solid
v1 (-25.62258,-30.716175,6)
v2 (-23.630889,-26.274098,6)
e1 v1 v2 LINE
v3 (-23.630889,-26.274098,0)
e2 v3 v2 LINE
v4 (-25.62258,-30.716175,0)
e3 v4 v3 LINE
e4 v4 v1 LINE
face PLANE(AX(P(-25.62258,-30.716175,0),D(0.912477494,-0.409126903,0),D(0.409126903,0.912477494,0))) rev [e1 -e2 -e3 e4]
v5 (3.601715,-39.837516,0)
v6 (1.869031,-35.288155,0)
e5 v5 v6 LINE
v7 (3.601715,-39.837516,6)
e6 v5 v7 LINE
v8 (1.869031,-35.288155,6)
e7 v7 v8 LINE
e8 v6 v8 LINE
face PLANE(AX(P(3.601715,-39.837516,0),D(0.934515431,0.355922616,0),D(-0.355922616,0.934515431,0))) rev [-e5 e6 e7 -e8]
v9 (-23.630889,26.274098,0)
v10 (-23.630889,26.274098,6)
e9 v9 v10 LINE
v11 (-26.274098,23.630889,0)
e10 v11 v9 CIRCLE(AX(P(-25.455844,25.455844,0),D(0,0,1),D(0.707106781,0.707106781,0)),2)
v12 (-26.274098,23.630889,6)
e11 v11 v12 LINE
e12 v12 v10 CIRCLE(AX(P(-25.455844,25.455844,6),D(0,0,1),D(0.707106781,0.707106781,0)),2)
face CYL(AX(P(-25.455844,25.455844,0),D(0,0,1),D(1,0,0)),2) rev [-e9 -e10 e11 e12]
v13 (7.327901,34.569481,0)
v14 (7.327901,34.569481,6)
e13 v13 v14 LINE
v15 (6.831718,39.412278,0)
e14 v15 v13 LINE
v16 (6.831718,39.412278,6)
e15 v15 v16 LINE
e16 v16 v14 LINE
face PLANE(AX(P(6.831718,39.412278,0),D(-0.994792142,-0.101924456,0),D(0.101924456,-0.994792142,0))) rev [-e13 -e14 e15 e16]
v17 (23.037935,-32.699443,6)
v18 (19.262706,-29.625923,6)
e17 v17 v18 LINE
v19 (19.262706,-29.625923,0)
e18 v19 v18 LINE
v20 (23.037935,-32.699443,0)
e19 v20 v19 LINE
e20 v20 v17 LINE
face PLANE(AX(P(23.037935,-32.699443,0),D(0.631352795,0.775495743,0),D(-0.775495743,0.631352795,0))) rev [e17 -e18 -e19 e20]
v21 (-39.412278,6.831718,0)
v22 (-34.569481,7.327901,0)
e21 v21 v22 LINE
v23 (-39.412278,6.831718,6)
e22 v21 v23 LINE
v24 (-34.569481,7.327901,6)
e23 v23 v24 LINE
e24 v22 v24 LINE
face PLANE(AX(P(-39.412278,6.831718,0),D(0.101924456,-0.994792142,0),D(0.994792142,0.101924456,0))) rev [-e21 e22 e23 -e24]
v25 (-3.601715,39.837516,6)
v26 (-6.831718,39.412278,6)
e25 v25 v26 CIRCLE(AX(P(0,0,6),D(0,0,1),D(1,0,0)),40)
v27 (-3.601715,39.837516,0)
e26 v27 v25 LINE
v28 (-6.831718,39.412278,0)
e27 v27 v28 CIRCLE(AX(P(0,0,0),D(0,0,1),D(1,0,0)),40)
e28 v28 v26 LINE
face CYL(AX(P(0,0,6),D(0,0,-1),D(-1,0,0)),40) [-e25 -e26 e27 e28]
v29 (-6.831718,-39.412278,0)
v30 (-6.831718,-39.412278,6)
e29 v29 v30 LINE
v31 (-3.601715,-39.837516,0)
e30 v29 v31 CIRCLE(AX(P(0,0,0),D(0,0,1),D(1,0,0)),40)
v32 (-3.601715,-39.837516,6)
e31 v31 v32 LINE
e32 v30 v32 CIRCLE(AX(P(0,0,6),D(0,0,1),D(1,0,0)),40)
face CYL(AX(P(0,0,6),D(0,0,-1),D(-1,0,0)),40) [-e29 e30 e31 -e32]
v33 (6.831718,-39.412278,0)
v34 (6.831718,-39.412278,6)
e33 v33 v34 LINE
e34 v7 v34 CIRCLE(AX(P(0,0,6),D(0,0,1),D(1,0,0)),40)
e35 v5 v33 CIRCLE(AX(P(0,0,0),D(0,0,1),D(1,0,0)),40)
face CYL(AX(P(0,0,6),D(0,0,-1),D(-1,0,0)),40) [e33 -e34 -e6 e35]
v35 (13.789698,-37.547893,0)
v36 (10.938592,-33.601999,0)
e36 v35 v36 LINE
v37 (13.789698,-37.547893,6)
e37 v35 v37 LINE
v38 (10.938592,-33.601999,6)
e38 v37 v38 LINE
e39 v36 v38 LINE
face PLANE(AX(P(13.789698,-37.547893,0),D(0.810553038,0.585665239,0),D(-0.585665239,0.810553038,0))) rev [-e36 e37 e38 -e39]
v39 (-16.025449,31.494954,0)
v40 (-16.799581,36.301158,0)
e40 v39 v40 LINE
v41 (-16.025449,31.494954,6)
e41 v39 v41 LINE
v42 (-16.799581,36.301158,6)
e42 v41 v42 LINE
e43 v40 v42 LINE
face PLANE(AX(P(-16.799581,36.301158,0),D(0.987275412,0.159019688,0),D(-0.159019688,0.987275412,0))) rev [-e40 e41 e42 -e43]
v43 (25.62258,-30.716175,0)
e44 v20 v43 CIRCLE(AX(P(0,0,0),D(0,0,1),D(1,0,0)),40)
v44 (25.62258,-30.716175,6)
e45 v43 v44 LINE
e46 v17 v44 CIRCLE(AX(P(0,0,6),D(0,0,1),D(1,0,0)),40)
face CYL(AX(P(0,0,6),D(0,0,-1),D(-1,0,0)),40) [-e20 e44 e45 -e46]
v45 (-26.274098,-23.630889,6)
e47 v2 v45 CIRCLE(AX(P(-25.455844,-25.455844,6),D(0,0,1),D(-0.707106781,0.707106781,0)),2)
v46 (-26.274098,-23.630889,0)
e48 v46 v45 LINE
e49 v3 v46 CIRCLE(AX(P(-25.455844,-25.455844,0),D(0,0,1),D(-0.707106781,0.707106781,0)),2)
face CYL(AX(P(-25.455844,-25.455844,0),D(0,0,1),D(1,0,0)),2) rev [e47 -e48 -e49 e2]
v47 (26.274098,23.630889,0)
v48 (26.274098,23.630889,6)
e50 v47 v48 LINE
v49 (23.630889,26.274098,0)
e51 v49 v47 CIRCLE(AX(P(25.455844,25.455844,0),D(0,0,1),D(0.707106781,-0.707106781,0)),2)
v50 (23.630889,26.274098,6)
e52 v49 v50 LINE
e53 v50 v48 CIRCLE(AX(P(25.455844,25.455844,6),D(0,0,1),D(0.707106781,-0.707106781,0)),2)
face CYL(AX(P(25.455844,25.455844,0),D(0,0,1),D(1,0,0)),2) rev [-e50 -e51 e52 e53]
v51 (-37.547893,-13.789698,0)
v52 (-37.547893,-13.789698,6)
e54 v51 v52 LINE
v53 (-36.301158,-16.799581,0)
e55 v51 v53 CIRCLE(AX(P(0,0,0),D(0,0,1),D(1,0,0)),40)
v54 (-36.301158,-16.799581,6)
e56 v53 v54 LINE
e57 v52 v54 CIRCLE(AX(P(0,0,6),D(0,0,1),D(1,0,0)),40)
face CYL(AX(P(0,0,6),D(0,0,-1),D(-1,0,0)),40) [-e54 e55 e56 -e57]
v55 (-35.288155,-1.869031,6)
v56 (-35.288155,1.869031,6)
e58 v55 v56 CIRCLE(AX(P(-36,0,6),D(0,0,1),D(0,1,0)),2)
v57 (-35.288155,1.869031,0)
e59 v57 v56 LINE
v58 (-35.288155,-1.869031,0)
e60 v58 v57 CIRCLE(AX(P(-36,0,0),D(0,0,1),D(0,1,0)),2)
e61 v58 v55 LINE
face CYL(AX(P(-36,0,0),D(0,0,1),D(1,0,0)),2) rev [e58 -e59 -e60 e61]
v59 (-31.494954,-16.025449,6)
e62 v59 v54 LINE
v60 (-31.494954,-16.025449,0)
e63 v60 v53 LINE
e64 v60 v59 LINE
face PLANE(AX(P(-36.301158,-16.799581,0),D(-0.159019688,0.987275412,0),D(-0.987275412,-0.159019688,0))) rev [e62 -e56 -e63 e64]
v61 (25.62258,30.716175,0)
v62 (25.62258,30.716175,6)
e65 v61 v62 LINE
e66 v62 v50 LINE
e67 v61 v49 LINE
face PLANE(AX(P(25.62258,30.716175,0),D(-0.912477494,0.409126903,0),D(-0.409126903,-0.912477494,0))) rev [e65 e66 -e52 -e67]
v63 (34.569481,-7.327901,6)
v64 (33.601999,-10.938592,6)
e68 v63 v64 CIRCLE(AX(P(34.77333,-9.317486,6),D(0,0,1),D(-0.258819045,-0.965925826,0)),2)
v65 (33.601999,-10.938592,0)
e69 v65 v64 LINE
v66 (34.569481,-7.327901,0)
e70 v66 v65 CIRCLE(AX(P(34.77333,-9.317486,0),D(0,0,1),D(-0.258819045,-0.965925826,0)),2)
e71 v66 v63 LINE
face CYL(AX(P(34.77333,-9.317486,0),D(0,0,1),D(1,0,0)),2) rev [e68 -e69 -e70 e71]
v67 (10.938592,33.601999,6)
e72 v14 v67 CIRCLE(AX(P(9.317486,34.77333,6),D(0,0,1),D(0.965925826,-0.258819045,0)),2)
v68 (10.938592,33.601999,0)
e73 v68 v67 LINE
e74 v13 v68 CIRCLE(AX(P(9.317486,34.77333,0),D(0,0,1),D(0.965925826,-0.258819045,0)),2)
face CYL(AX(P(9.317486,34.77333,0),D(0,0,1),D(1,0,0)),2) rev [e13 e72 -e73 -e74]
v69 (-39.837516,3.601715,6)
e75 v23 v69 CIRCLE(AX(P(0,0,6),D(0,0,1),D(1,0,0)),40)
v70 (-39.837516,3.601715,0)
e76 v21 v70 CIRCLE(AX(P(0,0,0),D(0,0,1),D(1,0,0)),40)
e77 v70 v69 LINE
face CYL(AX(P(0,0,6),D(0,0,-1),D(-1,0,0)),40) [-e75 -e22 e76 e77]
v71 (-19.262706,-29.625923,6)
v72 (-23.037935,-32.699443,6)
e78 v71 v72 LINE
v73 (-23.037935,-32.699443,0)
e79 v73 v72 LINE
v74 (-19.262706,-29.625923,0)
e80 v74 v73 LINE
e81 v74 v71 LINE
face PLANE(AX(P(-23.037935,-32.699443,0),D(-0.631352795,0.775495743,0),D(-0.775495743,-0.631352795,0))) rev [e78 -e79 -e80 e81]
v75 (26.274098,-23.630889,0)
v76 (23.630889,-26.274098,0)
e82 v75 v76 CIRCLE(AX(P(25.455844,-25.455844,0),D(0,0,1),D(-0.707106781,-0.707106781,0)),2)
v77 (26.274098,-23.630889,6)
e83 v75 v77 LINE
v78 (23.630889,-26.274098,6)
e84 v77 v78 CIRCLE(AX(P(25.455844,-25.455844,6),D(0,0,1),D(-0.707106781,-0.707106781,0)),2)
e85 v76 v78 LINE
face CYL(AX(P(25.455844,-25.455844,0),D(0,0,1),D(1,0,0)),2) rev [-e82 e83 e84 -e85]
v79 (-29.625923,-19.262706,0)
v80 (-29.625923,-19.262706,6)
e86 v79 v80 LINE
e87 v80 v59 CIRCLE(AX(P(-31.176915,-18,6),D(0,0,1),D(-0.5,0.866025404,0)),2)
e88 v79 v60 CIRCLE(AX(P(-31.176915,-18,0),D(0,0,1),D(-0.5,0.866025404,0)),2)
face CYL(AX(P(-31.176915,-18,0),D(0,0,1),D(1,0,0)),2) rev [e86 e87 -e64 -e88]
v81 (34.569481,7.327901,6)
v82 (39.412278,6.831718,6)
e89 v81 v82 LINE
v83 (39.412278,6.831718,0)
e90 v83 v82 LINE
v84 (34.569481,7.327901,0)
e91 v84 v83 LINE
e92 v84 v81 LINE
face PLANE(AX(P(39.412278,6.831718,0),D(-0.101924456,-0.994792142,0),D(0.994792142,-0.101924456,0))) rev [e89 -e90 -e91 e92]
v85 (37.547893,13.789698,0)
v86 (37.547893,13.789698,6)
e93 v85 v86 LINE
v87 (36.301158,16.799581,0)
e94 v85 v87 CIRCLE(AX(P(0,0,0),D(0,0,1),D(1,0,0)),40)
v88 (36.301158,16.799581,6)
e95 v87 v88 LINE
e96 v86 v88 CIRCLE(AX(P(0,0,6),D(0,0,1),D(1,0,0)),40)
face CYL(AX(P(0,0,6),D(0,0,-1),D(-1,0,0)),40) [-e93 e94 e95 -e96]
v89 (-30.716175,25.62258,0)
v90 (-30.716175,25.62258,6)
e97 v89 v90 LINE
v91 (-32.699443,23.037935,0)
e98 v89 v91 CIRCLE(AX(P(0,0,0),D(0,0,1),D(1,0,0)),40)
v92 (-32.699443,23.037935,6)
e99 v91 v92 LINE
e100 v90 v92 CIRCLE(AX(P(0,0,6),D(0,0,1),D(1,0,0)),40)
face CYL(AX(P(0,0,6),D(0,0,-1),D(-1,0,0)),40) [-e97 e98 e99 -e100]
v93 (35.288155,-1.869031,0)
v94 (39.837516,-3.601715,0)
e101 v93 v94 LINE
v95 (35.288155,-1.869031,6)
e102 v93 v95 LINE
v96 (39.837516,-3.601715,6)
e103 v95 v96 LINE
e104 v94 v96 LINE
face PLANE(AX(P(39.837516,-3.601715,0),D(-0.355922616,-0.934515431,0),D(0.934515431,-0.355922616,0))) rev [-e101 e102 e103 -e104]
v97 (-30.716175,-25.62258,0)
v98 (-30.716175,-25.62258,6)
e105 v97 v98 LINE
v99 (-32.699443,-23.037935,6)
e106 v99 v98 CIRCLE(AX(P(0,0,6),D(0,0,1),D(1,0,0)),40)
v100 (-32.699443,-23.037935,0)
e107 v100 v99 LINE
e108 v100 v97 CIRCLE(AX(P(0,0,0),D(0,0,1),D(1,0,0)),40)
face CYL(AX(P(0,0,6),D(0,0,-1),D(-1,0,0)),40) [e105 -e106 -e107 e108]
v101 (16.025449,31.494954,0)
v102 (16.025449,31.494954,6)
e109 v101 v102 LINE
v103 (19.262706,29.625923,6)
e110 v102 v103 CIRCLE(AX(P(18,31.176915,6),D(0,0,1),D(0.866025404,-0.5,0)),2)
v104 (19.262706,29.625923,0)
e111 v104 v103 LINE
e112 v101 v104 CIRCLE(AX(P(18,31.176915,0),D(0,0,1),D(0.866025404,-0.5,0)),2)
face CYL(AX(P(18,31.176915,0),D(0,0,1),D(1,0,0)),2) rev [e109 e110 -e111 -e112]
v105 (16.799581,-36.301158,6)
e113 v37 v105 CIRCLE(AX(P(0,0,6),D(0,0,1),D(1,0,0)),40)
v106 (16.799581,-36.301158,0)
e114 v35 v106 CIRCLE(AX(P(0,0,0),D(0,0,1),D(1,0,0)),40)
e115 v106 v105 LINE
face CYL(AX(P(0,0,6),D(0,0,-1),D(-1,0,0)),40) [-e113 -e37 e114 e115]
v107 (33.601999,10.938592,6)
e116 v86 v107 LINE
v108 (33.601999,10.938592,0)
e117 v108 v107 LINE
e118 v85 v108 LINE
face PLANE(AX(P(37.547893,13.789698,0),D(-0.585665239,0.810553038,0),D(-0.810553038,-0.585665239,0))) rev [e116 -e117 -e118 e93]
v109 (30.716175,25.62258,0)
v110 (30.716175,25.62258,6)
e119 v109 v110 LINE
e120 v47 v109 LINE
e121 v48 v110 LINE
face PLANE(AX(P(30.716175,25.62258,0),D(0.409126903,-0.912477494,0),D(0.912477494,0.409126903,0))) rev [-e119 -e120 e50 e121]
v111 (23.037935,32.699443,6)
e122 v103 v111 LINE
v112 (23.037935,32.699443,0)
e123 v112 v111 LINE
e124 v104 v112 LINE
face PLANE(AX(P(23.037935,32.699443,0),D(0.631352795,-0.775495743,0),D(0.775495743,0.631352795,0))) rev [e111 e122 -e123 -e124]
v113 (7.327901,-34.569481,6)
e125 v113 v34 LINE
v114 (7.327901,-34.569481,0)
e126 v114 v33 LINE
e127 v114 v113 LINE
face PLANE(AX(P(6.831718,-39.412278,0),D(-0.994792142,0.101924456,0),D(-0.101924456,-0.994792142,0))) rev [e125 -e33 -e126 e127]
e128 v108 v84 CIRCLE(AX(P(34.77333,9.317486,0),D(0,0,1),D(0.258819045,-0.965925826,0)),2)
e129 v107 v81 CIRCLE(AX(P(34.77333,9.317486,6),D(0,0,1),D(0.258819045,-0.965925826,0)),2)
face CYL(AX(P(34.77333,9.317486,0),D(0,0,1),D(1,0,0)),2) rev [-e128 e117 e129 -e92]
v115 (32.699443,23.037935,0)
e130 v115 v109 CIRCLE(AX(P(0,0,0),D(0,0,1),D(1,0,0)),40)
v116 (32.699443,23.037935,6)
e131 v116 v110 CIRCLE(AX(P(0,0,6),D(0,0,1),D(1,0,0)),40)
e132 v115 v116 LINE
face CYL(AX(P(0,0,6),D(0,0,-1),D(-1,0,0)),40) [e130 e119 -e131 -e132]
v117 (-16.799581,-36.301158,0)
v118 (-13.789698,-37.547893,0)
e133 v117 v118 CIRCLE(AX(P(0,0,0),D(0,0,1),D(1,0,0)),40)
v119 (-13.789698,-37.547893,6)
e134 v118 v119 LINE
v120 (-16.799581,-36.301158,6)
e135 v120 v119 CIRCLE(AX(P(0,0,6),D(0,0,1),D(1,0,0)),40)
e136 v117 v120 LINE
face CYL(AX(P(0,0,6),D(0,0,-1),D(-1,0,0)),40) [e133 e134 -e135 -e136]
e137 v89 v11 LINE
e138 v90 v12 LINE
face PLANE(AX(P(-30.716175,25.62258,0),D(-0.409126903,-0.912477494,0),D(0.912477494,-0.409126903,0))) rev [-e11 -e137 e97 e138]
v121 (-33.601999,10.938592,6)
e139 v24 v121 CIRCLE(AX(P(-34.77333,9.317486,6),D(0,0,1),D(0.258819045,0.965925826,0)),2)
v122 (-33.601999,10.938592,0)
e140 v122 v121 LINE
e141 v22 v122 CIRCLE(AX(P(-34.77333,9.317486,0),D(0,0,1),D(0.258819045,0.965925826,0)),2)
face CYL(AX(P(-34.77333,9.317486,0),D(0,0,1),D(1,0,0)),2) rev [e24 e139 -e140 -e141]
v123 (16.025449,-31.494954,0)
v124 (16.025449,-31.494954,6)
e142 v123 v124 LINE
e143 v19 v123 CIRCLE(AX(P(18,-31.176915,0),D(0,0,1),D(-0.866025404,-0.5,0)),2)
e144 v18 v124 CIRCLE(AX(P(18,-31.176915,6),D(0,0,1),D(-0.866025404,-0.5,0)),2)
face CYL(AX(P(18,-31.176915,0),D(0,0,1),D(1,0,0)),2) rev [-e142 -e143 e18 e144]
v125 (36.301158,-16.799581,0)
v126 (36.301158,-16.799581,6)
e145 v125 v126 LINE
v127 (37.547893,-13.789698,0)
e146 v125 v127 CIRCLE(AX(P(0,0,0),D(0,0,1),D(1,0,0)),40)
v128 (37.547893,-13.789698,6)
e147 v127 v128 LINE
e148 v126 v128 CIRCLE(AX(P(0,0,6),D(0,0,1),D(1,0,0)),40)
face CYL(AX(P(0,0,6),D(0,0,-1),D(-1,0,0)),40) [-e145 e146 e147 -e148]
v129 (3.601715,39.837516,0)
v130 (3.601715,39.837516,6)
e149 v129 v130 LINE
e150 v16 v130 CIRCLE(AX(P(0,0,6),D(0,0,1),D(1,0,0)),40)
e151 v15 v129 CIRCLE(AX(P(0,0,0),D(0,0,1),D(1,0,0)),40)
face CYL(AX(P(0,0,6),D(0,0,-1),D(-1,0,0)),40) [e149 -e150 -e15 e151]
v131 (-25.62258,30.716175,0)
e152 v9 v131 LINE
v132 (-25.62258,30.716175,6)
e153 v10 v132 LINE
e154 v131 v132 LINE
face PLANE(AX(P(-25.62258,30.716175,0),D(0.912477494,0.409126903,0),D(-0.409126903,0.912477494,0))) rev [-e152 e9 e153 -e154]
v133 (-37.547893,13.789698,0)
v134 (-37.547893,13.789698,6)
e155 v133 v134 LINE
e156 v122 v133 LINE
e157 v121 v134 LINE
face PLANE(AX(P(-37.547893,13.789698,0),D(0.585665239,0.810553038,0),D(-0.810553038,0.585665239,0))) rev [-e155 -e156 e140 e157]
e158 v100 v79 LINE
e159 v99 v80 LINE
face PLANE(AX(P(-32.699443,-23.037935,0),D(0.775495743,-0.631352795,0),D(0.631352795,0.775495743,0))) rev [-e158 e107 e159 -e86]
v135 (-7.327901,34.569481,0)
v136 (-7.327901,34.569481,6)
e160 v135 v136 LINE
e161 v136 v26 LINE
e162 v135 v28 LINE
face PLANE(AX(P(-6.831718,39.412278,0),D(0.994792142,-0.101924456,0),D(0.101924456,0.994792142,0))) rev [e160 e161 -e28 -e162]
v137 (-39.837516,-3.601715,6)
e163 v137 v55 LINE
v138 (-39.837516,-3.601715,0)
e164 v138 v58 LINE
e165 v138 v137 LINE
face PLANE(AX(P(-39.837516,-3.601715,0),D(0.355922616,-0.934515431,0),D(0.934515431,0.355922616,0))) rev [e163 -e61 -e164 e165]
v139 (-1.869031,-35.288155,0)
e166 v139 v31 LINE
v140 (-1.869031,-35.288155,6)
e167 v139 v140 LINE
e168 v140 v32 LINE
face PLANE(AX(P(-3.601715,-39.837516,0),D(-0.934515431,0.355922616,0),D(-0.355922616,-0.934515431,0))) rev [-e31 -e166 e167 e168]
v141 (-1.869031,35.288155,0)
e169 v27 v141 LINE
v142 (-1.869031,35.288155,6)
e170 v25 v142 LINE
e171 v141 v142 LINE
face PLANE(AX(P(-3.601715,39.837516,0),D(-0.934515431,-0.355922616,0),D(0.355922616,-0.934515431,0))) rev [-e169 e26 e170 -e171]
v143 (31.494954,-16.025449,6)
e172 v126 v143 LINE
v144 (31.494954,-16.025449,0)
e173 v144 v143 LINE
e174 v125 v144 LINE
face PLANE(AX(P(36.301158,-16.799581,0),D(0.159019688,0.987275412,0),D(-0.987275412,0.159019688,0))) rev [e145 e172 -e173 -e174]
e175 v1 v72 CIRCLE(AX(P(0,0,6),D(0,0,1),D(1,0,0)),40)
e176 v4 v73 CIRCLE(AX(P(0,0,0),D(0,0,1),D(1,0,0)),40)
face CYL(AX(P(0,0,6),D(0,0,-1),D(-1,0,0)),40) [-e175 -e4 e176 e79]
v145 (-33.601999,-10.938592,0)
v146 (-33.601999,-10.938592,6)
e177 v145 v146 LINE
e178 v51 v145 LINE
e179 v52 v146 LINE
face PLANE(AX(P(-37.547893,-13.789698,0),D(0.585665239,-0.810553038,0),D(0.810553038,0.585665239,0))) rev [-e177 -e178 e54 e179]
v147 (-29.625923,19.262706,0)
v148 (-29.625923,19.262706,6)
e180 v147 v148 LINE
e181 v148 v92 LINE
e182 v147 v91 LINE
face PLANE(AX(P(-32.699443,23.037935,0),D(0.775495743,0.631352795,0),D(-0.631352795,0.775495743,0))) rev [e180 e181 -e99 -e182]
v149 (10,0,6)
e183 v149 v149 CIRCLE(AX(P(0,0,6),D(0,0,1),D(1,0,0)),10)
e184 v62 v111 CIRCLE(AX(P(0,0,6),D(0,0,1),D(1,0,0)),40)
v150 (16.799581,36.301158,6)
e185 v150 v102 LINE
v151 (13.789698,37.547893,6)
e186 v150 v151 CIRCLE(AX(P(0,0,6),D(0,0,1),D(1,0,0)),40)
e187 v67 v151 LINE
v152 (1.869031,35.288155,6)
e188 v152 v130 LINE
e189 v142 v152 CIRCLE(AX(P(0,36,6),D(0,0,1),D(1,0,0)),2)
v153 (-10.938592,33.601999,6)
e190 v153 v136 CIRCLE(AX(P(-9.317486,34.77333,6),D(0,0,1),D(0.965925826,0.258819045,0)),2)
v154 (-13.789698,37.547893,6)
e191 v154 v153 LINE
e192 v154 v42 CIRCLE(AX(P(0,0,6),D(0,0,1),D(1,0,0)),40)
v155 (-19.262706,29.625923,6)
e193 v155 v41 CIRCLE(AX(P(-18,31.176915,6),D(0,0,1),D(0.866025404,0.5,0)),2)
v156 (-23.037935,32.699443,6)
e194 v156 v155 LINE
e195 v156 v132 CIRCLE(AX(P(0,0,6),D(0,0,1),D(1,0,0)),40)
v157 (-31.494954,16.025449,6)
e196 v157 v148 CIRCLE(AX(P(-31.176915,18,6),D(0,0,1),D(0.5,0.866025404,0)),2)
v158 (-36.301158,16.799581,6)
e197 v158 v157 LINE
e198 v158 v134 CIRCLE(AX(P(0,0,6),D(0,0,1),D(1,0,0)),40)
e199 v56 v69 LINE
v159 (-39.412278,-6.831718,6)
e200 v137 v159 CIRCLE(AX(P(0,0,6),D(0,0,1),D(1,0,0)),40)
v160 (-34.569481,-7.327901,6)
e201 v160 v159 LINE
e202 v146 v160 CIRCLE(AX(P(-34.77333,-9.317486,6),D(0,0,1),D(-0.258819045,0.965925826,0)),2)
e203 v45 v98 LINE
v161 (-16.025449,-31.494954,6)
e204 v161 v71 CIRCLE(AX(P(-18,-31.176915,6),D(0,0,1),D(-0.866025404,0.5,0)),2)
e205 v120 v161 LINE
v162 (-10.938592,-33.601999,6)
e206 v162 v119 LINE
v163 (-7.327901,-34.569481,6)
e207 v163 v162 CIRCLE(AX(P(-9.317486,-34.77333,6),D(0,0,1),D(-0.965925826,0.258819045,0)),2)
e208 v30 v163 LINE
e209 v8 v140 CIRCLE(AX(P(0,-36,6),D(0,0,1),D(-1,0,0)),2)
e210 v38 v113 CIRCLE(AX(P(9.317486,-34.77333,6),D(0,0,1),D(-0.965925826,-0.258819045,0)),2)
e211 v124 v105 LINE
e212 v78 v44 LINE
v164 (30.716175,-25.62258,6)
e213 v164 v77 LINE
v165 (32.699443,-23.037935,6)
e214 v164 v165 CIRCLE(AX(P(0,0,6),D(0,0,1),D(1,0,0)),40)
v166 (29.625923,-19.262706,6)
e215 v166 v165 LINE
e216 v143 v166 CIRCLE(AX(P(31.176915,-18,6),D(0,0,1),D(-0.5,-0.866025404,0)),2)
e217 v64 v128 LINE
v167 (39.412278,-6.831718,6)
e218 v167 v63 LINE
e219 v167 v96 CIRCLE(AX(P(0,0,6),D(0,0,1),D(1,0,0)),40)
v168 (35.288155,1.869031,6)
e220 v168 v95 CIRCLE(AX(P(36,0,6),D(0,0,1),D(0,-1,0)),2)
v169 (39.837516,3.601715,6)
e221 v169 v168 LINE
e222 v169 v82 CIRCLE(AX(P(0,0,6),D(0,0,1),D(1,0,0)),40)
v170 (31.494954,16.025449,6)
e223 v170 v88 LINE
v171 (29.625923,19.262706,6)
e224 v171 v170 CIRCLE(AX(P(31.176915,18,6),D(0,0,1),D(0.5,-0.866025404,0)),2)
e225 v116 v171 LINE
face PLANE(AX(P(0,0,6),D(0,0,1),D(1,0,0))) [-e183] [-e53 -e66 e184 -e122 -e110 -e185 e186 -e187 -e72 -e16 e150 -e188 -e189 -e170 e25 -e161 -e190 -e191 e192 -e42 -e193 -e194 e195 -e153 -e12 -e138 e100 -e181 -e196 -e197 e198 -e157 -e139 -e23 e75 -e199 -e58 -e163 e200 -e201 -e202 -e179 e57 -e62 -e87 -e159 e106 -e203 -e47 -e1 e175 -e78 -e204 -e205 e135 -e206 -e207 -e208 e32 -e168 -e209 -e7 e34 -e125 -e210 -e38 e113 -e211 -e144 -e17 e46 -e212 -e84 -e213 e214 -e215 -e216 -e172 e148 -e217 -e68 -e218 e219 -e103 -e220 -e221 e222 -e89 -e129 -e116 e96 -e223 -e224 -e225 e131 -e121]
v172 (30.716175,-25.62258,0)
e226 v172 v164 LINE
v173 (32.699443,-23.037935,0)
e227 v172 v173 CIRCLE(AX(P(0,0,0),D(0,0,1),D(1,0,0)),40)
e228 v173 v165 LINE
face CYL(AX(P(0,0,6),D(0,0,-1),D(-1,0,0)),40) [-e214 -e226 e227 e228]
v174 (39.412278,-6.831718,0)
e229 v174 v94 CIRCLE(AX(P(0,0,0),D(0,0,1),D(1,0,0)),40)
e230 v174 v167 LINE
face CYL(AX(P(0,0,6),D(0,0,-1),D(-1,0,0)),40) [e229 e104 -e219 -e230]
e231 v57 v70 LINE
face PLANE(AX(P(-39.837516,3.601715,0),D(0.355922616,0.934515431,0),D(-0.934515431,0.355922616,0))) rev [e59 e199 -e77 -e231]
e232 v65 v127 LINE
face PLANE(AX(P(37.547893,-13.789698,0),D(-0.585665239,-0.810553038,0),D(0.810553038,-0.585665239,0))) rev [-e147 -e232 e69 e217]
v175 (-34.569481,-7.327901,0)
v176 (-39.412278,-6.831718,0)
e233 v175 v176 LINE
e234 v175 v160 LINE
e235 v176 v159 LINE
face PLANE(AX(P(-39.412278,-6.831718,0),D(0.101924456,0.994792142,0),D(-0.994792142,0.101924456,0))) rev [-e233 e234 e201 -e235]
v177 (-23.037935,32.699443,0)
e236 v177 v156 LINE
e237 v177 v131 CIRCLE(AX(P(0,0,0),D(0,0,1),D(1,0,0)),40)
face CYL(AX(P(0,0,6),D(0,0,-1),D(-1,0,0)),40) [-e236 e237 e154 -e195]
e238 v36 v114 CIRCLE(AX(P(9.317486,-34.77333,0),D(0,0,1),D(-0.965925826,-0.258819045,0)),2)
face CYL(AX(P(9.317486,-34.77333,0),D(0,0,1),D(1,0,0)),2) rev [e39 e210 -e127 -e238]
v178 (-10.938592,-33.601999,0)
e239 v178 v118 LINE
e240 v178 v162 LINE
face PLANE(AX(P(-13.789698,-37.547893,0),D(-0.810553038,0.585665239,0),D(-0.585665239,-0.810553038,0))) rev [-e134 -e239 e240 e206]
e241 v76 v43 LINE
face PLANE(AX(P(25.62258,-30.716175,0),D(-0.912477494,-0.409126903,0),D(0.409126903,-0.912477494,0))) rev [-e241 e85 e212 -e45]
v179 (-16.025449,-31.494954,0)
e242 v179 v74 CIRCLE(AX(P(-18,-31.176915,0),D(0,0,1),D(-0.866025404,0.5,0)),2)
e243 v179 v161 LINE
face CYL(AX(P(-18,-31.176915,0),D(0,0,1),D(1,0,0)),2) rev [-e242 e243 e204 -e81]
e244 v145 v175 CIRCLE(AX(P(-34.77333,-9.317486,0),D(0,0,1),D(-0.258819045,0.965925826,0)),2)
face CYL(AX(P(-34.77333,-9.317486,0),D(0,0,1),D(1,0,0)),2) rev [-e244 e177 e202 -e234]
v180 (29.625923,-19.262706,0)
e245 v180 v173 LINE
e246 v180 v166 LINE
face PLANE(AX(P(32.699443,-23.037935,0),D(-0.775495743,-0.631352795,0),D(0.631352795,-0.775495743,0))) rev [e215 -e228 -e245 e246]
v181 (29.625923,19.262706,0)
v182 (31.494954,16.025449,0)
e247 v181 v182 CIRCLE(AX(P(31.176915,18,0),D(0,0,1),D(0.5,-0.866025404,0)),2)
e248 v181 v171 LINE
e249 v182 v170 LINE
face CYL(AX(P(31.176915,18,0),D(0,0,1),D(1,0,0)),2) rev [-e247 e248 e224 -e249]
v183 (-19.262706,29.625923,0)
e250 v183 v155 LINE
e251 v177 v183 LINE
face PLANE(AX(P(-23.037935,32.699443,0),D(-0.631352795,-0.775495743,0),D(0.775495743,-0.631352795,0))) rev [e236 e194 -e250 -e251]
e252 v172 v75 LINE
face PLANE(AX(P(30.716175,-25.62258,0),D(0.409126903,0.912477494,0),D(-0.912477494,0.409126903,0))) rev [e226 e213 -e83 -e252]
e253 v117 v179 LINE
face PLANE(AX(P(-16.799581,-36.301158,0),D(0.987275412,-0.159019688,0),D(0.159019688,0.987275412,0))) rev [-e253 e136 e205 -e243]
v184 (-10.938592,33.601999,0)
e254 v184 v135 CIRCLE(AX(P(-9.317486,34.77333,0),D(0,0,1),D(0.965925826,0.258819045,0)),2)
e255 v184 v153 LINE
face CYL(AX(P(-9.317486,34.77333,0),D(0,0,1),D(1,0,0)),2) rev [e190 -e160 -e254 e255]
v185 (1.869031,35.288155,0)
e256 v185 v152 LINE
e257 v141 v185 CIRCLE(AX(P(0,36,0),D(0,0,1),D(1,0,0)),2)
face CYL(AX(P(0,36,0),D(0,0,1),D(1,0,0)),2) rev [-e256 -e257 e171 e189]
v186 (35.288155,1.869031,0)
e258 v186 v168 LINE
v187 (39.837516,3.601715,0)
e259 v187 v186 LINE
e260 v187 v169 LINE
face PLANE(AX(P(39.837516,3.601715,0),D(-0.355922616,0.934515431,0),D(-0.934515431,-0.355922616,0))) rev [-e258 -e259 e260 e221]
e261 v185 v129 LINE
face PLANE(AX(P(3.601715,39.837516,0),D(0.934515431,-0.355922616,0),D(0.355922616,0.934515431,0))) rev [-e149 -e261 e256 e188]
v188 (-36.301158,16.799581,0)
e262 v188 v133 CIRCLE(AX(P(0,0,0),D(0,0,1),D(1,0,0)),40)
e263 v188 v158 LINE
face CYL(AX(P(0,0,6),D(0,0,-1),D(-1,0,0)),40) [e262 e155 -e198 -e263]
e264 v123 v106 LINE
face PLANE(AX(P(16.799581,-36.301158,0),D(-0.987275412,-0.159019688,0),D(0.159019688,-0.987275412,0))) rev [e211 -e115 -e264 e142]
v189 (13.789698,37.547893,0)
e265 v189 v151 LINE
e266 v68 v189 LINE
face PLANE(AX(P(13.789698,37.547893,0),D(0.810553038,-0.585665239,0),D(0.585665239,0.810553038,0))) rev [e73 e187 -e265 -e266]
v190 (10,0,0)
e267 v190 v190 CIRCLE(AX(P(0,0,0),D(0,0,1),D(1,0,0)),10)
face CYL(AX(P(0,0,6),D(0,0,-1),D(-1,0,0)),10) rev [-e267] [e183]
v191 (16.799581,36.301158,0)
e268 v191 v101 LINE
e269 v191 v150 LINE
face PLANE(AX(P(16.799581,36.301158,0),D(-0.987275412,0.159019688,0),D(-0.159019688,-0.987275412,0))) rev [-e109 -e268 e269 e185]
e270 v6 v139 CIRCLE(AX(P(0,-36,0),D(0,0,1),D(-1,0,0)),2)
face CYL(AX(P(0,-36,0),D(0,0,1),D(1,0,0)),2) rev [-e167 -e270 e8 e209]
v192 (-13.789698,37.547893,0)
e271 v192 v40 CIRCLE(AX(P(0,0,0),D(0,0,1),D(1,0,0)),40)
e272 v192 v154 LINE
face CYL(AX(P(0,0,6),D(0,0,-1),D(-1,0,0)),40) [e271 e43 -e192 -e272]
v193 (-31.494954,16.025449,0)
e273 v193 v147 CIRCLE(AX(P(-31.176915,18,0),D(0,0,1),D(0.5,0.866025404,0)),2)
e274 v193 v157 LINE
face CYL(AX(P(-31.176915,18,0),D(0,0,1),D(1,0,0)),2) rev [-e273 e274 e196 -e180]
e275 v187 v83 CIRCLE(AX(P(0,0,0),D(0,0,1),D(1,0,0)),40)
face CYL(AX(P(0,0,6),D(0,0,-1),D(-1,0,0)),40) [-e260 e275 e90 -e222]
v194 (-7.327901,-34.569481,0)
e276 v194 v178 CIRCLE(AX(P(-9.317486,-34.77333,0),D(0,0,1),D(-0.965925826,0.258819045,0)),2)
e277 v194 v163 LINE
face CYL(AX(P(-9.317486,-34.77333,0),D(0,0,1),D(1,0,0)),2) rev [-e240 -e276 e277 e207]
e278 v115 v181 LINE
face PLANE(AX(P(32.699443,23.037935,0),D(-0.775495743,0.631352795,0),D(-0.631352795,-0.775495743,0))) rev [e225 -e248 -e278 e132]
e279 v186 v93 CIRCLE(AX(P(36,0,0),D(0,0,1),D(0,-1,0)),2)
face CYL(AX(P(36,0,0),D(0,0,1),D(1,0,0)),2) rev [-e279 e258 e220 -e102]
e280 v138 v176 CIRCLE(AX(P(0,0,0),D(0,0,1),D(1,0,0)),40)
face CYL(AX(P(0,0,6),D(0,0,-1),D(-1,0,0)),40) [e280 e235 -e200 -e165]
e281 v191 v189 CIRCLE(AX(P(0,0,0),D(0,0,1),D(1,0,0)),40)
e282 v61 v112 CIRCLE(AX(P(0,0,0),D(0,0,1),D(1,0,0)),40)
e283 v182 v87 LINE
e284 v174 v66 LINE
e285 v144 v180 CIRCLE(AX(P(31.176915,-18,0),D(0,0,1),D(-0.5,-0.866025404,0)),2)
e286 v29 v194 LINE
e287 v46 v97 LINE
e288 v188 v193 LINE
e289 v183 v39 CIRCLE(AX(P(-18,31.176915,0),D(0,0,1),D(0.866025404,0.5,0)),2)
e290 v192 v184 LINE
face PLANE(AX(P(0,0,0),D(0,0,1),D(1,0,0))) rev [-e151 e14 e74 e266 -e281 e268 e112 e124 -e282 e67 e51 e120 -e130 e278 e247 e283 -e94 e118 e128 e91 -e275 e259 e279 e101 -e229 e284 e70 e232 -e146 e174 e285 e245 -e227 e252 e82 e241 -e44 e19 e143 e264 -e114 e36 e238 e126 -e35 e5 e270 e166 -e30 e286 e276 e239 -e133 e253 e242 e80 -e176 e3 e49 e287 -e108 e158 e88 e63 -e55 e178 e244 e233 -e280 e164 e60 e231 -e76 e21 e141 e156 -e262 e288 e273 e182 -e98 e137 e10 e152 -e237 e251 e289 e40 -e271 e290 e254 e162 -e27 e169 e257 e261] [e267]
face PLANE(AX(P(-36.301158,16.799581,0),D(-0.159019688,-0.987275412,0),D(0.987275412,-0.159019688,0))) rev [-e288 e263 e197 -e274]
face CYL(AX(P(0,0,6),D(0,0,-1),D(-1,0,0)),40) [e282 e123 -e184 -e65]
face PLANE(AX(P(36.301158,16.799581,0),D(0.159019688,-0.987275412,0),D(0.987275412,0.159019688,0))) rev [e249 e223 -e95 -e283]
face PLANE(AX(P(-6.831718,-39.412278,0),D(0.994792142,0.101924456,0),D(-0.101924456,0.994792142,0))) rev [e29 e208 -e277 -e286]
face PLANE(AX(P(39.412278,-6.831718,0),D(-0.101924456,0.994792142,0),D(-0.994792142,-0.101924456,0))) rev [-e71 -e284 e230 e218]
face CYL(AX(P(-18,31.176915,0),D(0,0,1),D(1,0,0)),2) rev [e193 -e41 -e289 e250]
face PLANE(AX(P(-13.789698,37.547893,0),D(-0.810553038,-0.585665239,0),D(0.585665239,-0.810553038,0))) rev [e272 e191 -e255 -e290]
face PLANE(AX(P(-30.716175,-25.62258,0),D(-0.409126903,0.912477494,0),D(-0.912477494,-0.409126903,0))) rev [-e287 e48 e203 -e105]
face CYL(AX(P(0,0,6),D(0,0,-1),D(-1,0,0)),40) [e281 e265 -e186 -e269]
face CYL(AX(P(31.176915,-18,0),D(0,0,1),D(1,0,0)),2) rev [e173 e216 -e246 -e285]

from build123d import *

# Parameters (mm, degrees)
SKETCH1_R           = 40
SKETCH1_R_2         = 10
BOSS_EXTRUDE1_DEPTH = 6
CUT_EXTRUDE1_START  = -6
CUT_EXTRUDE1_DEPTH  = 6
CIRPATTERN1_DEPTH   = 6


# Read off the part's stored shape, not the designer's step: CirPattern1
with BuildPart() as part:
    # Sketch1 → Boss-Extrude1 (new body)
    with BuildSketch(Plane.XY):
        Circle(SKETCH1_R)
        Circle(SKETCH1_R_2, mode=Mode.SUBTRACT)
    extrude(amount=BOSS_EXTRUDE1_DEPTH)

    # Sketch2 → Cut-Extrude1 (cut)
    with BuildSketch(Plane.XY.offset(6).offset(CUT_EXTRUDE1_START)):
        with BuildLine():
            Line((-3.601715358, 39.837515566), (-1.869030862, 35.288154767))
            ThreePointArc((-1.869030862, 35.288154767), (0, 34), (1.869030862, 35.288154767))
            Line((1.869030862, 35.288154767), (3.601715358, 39.837515566))
            ThreePointArc((3.601715358, 39.837515566), (0, 40), (-3.601715358, 39.837515566))
        make_face()
    extrude(amount=CUT_EXTRUDE1_DEPTH, mode=Mode.SUBTRACT)

    # CirPattern1 outline → CirPattern1 (cut)
    with BuildSketch(Plane.XY):
        with BuildLine():
            Line((-13.789697621, 37.547892611), (-10.9385917, 33.601999269))
            ThreePointArc((-10.9385917, 33.601999269), (-8.799847533, 32.841478094), (-7.32790134, 34.569480835))
            Line((-7.32790134, 34.569480835), (-6.831717855, 39.41227767))
            ThreePointArc((-6.831717855, 39.41227767), (-10.352761804, 38.637033051), (-13.789697621, 37.547892611))
        make_face()
        with BuildLine():
            Line((10.9385917, 33.601999269), (13.789697621, 37.547892611))
            ThreePointArc((13.789697621, 37.547892611), (10.352761804, 38.637033051), (6.831717855, 39.41227767))
            Line((6.831717855, 39.41227767), (7.32790134, 34.569480835))
            ThreePointArc((7.32790134, 34.569480835), (8.799847533, 32.841478094), (10.9385917, 33.601999269))
        make_face()
        with BuildLine():
            Line((19.262705591, 29.62592305), (23.03793478, 32.699442825))
            ThreePointArc((23.03793478, 32.699442825), (20, 34.641016151), (16.799580786, 36.301158183))
            Line((16.799580786, 36.301158183), (16.025449176, 31.494953912))
            ThreePointArc((16.025449176, 31.494953912), (17, 29.444863729), (19.262705591, 29.62592305))
        make_face()
        with BuildLine():
            Line((26.274097929, 23.630889134), (30.716174756, 25.622580049))
            ThreePointArc((30.716174756, 25.622580049), (28.284271247, 28.284271247), (25.622580049, 30.716174756))
            Line((25.622580049, 30.716174756), (23.630889134, 26.274097929))
            ThreePointArc((23.630889134, 26.274097929), (24.04163056, 24.04163056), (26.274097929, 23.630889134))
        make_face()
        with BuildLine():
            Line((31.494953912, 16.025449176), (36.301158183, 16.799580786))
            ThreePointArc((36.301158183, 16.799580786), (34.641016151, 20), (32.699442825, 23.03793478))
            Line((32.699442825, 23.03793478), (29.62592305, 19.262705591))
            ThreePointArc((29.62592305, 19.262705591), (29.444863729, 17), (31.494953912, 16.025449176))
        make_face()
        with BuildLine():
            Line((34.569480835, 7.32790134), (39.41227767, 6.831717855))
            ThreePointArc((39.41227767, 6.831717855), (38.637033052, 10.352761804), (37.547892611, 13.789697621))
            Line((37.547892611, 13.789697621), (33.601999269, 10.9385917))
            ThreePointArc((33.601999269, 10.9385917), (32.841478094, 8.799847533), (34.569480835, 7.32790134))
        make_face()
        with BuildLine():
            Line((35.288154767, -1.869030862), (39.837515566, -3.601715358))
            ThreePointArc((39.837515566, -3.601715358), (40, 0), (39.837515566, 3.601715358))
            Line((39.837515566, 3.601715358), (35.288154767, 1.869030862))
            ThreePointArc((35.288154767, 1.869030862), (34, 0), (35.288154767, -1.869030862))
        make_face()
        with BuildLine():
            Line((33.601999269, -10.9385917), (37.547892611, -13.789697621))
            ThreePointArc((37.547892611, -13.789697621), (38.637033052, -10.352761804), (39.41227767, -6.831717855))
            Line((39.41227767, -6.831717855), (34.569480835, -7.32790134))
            ThreePointArc((34.569480835, -7.32790134), (32.841478094, -8.799847533), (33.601999269, -10.9385917))
        make_face()
        with BuildLine():
            Line((29.62592305, -19.262705591), (32.699442825, -23.03793478))
            ThreePointArc((32.699442825, -23.03793478), (34.641016151, -20), (36.301158183, -16.799580786))
            Line((36.301158183, -16.799580786), (31.494953912, -16.025449176))
            ThreePointArc((31.494953912, -16.025449176), (29.444863729, -17), (29.62592305, -19.262705591))
        make_face()
        with BuildLine():
            Line((23.630889134, -26.274097929), (25.622580049, -30.716174756))
            ThreePointArc((25.622580049, -30.716174756), (28.284271247, -28.284271247), (30.716174756, -25.622580049))
            Line((30.716174756, -25.622580049), (26.274097929, -23.630889134))
            ThreePointArc((26.274097929, -23.630889134), (24.04163056, -24.04163056), (23.630889134, -26.274097929))
        make_face()
        with BuildLine():
            Line((16.025449176, -31.494953912), (16.799580786, -36.301158183))
            ThreePointArc((16.799580786, -36.301158183), (20, -34.641016151), (23.03793478, -32.699442825))
            Line((23.03793478, -32.699442825), (19.262705591, -29.62592305))
            ThreePointArc((19.262705591, -29.62592305), (17, -29.444863729), (16.025449176, -31.494953912))
        make_face()
        with BuildLine():
            Line((7.32790134, -34.569480835), (6.831717855, -39.41227767))
            ThreePointArc((6.831717855, -39.41227767), (10.352761804, -38.637033052), (13.789697621, -37.547892611))
            Line((13.789697621, -37.547892611), (10.9385917, -33.601999269))
            ThreePointArc((10.9385917, -33.601999269), (8.799847533, -32.841478094), (7.32790134, -34.569480835))
        make_face()
        with BuildLine():
            Line((-1.869030862, -35.288154767), (-3.601715358, -39.837515566))
            ThreePointArc((-3.601715358, -39.837515566), (0, -40), (3.601715358, -39.837515566))
            Line((3.601715358, -39.837515566), (1.869030862, -35.288154767))
            ThreePointArc((1.869030862, -35.288154767), (0, -34), (-1.869030862, -35.288154767))
        make_face()
        with BuildLine():
            Line((-10.9385917, -33.601999269), (-13.789697621, -37.547892611))
            ThreePointArc((-13.789697621, -37.547892611), (-10.352761804, -38.637033052), (-6.831717855, -39.41227767))
            Line((-6.831717855, -39.41227767), (-7.32790134, -34.569480835))
            ThreePointArc((-7.32790134, -34.569480835), (-8.799847533, -32.841478094), (-10.9385917, -33.601999269))
        make_face()
        with BuildLine():
            Line((-19.262705591, -29.62592305), (-23.03793478, -32.699442825))
            ThreePointArc((-23.03793478, -32.699442825), (-20, -34.641016151), (-16.799580786, -36.301158183))
            Line((-16.799580786, -36.301158183), (-16.025449176, -31.494953912))
            ThreePointArc((-16.025449176, -31.494953912), (-17, -29.444863729), (-19.262705591, -29.62592305))
        make_face()
        with BuildLine():
            Line((-26.274097929, -23.630889134), (-30.716174756, -25.622580049))
            ThreePointArc((-30.716174756, -25.622580049), (-28.284271247, -28.284271247), (-25.622580049, -30.716174756))
            Line((-25.622580049, -30.716174756), (-23.630889134, -26.274097929))
            ThreePointArc((-23.630889134, -26.274097929), (-24.04163056, -24.04163056), (-26.274097929, -23.630889134))
        make_face()
        with BuildLine():
            Line((-31.494953912, -16.025449176), (-36.301158183, -16.799580786))
            ThreePointArc((-36.301158183, -16.799580786), (-34.641016151, -20), (-32.699442825, -23.03793478))
            Line((-32.699442825, -23.03793478), (-29.62592305, -19.262705591))
            ThreePointArc((-29.62592305, -19.262705591), (-29.444863729, -17), (-31.494953912, -16.025449176))
        make_face()
        with BuildLine():
            Line((-34.569480835, -7.32790134), (-39.41227767, -6.831717855))
            ThreePointArc((-39.41227767, -6.831717855), (-38.637033052, -10.352761804), (-37.547892611, -13.789697621))
            Line((-37.547892611, -13.789697621), (-33.601999269, -10.9385917))
            ThreePointArc((-33.601999269, -10.9385917), (-32.841478094, -8.799847533), (-34.569480835, -7.32790134))
        make_face()
        with BuildLine():
            Line((-35.288154767, 1.869030862), (-39.837515566, 3.601715358))
            ThreePointArc((-39.837515566, 3.601715358), (-40, 0), (-39.837515566, -3.601715358))
            Line((-39.837515566, -3.601715358), (-35.288154767, -1.869030862))
            ThreePointArc((-35.288154767, -1.869030862), (-34, 0), (-35.288154767, 1.869030862))
        make_face()
        with BuildLine():
            Line((-33.601999269, 10.9385917), (-37.547892611, 13.789697621))
            ThreePointArc((-37.547892611, 13.789697621), (-38.637033052, 10.352761804), (-39.41227767, 6.831717855))
            Line((-39.41227767, 6.831717855), (-34.569480835, 7.32790134))
            ThreePointArc((-34.569480835, 7.32790134), (-32.841478094, 8.799847533), (-33.601999269, 10.9385917))
        make_face()
        with BuildLine():
            Line((-29.62592305, 19.262705591), (-32.699442825, 23.03793478))
            ThreePointArc((-32.699442825, 23.03793478), (-34.641016151, 20), (-36.301158183, 16.799580786))
            Line((-36.301158183, 16.799580786), (-31.494953912, 16.025449176))
            ThreePointArc((-31.494953912, 16.025449176), (-29.444863729, 17), (-29.62592305, 19.262705591))
        make_face()
        with BuildLine():
            Line((-23.630889134, 26.274097929), (-25.622580049, 30.716174756))
            ThreePointArc((-25.622580049, 30.716174756), (-28.284271247, 28.284271247), (-30.716174756, 25.622580049))
            Line((-30.716174756, 25.622580049), (-26.274097929, 23.630889134))
            ThreePointArc((-26.274097929, 23.630889134), (-24.04163056, 24.04163056), (-23.630889134, 26.274097929))
        make_face()
        with BuildLine():
            Line((-16.025449176, 31.494953912), (-16.799580786, 36.301158183))
            ThreePointArc((-16.799580786, 36.301158183), (-20, 34.641016151), (-23.03793478, 32.699442825))
            Line((-23.03793478, 32.699442825), (-19.262705591, 29.62592305))
            ThreePointArc((-19.262705591, 29.62592305), (-17, 29.444863729), (-16.025449176, 31.494953912))
        make_face()
    extrude(amount=CIRPATTERN1_DEPTH, mode=Mode.SUBTRACT)


solid = part.part
